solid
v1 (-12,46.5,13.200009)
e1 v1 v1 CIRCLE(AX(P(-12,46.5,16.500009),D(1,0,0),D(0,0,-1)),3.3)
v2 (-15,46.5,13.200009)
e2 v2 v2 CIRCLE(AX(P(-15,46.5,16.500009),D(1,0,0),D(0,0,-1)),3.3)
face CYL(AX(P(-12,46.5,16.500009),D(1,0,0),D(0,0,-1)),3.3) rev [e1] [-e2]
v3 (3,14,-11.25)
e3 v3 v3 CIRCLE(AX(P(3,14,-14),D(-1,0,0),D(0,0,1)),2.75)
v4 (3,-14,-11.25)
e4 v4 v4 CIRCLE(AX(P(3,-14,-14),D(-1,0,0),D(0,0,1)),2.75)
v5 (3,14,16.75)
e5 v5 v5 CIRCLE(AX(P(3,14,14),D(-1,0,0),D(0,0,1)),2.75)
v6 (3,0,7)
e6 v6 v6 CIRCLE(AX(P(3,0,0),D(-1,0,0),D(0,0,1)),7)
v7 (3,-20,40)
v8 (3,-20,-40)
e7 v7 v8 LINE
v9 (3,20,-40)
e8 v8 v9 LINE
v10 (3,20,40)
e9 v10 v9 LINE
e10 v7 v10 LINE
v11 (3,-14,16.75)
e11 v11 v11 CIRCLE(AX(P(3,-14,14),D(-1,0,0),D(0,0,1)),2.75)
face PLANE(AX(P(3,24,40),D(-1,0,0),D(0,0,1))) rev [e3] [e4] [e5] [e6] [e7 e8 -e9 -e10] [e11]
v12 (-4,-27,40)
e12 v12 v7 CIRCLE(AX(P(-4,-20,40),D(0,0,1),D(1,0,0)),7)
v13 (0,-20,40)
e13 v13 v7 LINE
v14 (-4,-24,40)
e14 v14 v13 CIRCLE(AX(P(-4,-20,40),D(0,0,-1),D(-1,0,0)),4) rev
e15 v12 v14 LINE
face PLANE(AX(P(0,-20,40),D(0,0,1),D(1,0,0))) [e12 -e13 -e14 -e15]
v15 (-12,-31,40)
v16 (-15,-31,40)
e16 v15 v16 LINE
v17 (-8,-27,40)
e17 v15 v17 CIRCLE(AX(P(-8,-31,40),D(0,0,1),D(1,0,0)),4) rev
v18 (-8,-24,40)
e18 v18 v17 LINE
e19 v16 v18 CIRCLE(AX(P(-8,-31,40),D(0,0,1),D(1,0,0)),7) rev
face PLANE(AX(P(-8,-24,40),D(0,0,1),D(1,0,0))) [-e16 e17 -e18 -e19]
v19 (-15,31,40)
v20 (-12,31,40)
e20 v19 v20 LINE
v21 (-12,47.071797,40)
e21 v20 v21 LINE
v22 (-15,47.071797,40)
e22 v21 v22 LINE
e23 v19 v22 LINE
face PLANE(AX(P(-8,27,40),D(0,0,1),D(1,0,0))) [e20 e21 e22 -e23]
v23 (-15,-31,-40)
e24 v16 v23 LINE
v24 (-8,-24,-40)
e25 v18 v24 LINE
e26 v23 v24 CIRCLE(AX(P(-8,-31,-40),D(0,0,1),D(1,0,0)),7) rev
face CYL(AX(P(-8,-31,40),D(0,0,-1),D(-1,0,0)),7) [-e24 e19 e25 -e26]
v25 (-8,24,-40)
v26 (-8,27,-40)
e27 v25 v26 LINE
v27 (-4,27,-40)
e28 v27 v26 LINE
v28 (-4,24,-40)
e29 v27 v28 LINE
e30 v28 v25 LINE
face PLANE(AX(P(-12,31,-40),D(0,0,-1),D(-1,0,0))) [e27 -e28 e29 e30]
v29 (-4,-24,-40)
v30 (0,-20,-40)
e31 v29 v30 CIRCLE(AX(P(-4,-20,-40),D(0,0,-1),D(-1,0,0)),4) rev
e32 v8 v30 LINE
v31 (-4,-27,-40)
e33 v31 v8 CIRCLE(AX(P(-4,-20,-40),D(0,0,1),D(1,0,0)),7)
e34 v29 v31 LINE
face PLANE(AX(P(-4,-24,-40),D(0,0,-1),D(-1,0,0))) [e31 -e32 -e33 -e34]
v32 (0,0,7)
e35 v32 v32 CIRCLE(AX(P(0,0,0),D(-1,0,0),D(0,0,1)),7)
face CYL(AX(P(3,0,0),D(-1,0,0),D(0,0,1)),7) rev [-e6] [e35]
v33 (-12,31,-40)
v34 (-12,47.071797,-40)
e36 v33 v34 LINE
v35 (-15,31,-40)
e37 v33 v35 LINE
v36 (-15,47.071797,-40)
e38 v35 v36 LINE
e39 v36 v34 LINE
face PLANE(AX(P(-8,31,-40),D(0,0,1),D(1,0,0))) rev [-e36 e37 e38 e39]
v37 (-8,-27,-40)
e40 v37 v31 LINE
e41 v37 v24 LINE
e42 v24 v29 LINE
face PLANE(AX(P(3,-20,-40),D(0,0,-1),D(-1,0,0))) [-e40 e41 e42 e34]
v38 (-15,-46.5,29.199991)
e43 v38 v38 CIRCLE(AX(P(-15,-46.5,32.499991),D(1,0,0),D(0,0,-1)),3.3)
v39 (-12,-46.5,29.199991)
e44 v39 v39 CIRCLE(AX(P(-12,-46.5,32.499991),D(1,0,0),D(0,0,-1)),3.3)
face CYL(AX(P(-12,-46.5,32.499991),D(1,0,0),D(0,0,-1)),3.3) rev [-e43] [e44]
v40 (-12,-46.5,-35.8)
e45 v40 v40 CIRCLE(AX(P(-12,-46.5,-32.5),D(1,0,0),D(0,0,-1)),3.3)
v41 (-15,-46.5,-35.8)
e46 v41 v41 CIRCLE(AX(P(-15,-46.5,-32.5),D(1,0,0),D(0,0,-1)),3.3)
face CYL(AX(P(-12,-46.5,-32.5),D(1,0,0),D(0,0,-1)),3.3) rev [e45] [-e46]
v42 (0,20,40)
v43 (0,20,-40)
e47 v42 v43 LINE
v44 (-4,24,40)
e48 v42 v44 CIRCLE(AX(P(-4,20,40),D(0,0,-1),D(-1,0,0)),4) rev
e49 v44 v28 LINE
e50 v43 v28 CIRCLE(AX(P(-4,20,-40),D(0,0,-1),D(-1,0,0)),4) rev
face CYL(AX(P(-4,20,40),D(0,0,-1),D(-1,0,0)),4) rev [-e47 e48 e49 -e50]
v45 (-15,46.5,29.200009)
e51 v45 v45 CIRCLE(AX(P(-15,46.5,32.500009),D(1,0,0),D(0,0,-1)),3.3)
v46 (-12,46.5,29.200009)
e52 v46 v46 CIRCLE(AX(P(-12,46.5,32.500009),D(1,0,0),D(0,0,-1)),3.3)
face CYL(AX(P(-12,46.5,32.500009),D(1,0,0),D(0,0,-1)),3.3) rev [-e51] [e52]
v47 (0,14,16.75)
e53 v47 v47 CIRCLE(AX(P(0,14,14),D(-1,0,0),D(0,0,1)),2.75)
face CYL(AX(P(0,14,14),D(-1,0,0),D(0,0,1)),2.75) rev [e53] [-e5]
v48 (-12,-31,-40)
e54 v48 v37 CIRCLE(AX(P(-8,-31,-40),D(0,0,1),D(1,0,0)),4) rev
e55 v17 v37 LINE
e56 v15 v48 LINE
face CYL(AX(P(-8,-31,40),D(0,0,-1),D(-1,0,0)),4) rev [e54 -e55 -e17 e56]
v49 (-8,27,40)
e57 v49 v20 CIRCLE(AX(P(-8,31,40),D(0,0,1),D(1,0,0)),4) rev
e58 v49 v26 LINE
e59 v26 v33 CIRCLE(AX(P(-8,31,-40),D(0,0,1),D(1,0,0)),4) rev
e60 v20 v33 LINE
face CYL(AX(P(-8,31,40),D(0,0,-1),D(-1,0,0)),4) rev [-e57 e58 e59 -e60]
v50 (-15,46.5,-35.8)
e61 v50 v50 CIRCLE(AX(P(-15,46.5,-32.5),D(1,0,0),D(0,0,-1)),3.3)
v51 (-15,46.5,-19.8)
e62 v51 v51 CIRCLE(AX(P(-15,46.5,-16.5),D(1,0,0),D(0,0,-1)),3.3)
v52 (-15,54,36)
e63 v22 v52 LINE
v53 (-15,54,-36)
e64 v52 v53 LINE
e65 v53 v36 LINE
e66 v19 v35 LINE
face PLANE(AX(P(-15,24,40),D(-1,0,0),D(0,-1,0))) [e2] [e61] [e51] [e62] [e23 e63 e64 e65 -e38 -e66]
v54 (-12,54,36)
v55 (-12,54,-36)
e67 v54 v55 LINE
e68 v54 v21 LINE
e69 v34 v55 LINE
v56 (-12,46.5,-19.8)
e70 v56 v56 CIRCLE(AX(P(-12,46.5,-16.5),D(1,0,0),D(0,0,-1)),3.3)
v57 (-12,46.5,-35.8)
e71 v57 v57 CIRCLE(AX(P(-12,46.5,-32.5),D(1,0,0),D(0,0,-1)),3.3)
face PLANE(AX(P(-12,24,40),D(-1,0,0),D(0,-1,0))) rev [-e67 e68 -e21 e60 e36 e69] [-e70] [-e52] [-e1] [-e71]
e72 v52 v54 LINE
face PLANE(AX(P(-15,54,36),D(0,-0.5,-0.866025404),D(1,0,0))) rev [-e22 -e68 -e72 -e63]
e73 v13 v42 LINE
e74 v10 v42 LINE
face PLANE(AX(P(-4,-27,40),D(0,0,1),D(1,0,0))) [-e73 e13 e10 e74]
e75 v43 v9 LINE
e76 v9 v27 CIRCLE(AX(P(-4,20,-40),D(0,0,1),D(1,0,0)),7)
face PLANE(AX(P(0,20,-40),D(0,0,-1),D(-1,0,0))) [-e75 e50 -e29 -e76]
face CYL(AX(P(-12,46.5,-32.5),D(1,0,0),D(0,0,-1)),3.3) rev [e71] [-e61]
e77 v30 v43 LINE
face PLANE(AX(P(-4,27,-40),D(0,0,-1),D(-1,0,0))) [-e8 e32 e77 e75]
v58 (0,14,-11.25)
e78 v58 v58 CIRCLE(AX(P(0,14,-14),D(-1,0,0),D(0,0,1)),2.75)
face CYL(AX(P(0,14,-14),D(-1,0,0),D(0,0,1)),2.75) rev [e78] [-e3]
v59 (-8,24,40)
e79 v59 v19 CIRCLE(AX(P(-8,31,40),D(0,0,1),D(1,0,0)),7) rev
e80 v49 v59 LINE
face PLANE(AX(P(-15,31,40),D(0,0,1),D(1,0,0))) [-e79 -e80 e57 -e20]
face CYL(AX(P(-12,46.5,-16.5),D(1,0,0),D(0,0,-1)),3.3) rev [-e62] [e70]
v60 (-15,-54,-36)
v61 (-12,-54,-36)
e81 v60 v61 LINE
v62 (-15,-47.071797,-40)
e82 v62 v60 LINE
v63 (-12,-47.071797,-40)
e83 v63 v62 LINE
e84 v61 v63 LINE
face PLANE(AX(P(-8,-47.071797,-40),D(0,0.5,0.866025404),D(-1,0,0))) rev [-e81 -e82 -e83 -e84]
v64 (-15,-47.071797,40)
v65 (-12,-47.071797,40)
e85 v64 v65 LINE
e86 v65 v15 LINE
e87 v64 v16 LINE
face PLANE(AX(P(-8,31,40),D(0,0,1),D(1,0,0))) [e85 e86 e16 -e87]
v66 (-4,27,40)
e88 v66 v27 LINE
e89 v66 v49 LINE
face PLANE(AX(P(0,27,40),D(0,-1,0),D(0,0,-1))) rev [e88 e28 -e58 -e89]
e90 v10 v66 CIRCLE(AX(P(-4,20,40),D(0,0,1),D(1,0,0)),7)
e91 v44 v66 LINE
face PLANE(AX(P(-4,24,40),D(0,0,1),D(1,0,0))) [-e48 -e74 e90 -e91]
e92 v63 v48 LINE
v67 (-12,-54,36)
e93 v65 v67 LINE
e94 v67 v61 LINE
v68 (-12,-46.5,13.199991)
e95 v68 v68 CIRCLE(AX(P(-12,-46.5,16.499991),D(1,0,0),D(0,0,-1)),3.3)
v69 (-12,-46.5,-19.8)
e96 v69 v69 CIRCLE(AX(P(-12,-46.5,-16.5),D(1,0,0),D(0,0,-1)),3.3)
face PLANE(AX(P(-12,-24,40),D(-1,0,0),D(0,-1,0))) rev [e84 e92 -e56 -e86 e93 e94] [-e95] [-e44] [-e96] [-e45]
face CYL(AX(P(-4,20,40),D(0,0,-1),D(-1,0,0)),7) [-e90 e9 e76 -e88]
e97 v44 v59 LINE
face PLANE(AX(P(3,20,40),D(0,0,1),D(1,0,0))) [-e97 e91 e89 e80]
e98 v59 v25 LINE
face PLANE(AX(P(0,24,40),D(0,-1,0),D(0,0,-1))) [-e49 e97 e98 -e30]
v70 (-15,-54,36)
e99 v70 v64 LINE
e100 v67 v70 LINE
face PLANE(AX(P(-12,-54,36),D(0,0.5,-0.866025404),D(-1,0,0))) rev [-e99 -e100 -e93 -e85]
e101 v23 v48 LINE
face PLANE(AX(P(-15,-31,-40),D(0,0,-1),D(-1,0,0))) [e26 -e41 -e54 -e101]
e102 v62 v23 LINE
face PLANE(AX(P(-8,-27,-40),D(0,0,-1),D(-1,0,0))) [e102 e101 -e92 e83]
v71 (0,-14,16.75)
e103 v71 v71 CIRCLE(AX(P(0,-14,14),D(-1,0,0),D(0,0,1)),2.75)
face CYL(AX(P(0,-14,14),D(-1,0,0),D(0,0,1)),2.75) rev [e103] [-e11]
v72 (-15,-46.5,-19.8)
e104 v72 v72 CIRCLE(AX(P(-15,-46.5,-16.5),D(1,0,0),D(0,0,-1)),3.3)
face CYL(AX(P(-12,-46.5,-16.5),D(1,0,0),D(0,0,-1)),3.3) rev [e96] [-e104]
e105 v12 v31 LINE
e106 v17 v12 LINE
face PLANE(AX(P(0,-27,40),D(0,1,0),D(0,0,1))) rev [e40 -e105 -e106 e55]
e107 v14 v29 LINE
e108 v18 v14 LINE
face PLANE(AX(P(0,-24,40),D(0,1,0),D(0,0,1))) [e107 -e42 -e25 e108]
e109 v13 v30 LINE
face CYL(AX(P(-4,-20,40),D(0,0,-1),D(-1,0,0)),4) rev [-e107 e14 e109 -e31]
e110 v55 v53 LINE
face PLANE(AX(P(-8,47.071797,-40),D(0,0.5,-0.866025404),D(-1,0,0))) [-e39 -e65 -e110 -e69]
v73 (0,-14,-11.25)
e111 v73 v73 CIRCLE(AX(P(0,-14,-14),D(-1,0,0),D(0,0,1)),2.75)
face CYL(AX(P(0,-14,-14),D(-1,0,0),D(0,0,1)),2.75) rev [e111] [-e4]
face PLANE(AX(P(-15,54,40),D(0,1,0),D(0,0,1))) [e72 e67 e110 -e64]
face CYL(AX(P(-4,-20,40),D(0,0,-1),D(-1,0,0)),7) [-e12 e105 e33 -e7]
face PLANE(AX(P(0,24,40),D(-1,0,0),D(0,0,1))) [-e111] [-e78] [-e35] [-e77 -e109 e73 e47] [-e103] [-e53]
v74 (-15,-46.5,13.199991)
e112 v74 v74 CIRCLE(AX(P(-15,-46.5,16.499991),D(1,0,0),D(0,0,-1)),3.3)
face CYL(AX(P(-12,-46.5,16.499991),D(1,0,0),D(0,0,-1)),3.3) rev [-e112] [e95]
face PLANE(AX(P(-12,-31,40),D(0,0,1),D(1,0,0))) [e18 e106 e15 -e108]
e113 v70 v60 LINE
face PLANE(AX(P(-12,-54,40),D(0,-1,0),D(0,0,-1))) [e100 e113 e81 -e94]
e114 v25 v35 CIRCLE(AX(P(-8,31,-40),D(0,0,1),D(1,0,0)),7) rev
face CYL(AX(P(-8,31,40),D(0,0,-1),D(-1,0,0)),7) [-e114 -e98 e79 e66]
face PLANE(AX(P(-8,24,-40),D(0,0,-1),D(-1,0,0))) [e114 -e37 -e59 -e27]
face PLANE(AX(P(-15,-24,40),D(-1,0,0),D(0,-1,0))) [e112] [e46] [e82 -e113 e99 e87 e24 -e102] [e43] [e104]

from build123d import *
from OCP.BRepFilletAPI import BRepFilletAPI_MakeChamfer

# Parameters (mm, degrees)
ODGI_CIE_BAZOWE1_DEPTH     = 40
OTW_R_POD_RUB_M51_D        = 5.5
SZKIC4_R                   = 7
WYTNIJ_WYCI_GNI_CIE1_DEPTH = 69.85491994
OTW_R_POD_RUB_M61_D        = 6.6
SFAZOWANIE1_SIZE           = 4
SFAZOWANIE1_SIZE2          = 6.92820323


# Sheet-metal steps are written as plain solids
with BuildPart() as part:
    # Szkic1 → Odgięcie bazowe1 (new, symmetric)
    with BuildSketch(Plane.XY):
        with BuildLine():
            Line((-15, 54), (-15, 31))
            ThreePointArc((-15, 31), (-12.949747468, 26.050252532), (-8, 24))
            Line((-8, 24), (-4, 24))
            ThreePointArc((-4, 24), (-1.171572875, 22.828427125), (0, 20))
            Line((0, 20), (0, -20))
            ThreePointArc((0, -20), (-1.171572875, -22.828427125), (-4, -24))
            Line((-4, -24), (-8, -24))
            ThreePointArc((-8, -24), (-12.949747468, -26.050252532), (-15, -31))
            Line((-15, -31), (-15, -54))
            Line((-15, -54), (-12, -54))
            Line((-12, -54), (-12, -31))
            ThreePointArc((-12, -31), (-10.828427125, -28.171572875), (-8, -27))
            Line((-8, -27), (-4, -27))
            ThreePointArc((-4, -27), (0.949747468, -24.949747468), (3, -20))
            Line((3, -20), (3, 20))
            ThreePointArc((3, 20), (0.949747468, 24.949747468), (-4, 27))
            Line((-4, 27), (-8, 27))
            ThreePointArc((-8, 27), (-10.828427125, 28.171572875), (-12, 31))
            Line((-12, 31), (-12, 54))
            Line((-12, 54), (-15, 54))
        make_face()
    extrude(amount=ODGI_CIE_BAZOWE1_DEPTH, both=True)

    # Otwór pod śrubę M51 (through all)
    with Locations(Plane.ZY):
        with Locations((-14, 14), (14, 14), (14, -14), (-14, -14)):
            Hole(OTW_R_POD_RUB_M51_D / 2)

    # Szkic4 → Wytnij-wyciągnięcie1 (cut, through all)
    with BuildSketch(Plane.ZY):
        Circle(SZKIC4_R)
    extrude(amount=-WYTNIJ_WYCI_GNI_CIE1_DEPTH, mode=Mode.SUBTRACT)

    # Otwór pod śrubę M61 (through all)
    with Locations(Plane(origin=(-12, 0, 0), x_dir=(0, 0, -1), z_dir=(1, 0, 0))):
        with Locations((-32.50000905, 46.5), (-16.50000905, 46.5), (16.5, 46.5), (32.5, 46.5), (32.5, -46.5), (16.5, -46.5), (-16.49999095, -46.5), (-32.49999095, -46.5)):
            Hole(OTW_R_POD_RUB_M61_D / 2)

    # Sfazowanie1: one chamfer whose edges measure the first distance from different faces: ONE call of the kernel's chamfer builder (chamfer() names one face for all edges)
    sfazowanie1_edges_1 = [part.edges().sort_by_distance(p)[0] for p in [
        (-13.5, -54, -40),
        (-13.5, -54, 40),
    ]]
    sfazowanie1_side_1 = [part.faces().sort_by_distance(p)[0] for p in [
        (-13.5, -54, 0),
    ]]
    sfazowanie1_edges_2 = [part.edges().sort_by_distance(p)[0] for p in [
        (-13.5, 54, -40),
        (-13.5, 54, 40),
    ]]
    sfazowanie1_side_2 = [part.faces().sort_by_distance(p)[0] for p in [
        (-13.5, 54, 0),
    ]]
    sfazowanie1 = BRepFilletAPI_MakeChamfer(part.part.solid().wrapped)
    for e in sfazowanie1_edges_1:
        sfazowanie1.Add(SFAZOWANIE1_SIZE, SFAZOWANIE1_SIZE2, e.wrapped, sfazowanie1_side_1[0].wrapped)  # the first distance lies on this face
    for e in sfazowanie1_edges_2:
        sfazowanie1.Add(SFAZOWANIE1_SIZE, SFAZOWANIE1_SIZE2, e.wrapped, sfazowanie1_side_2[0].wrapped)  # the first distance lies on this face
    add(Compound.cast(sfazowanie1.Shape()), mode=Mode.REPLACE)


solid = part.part
